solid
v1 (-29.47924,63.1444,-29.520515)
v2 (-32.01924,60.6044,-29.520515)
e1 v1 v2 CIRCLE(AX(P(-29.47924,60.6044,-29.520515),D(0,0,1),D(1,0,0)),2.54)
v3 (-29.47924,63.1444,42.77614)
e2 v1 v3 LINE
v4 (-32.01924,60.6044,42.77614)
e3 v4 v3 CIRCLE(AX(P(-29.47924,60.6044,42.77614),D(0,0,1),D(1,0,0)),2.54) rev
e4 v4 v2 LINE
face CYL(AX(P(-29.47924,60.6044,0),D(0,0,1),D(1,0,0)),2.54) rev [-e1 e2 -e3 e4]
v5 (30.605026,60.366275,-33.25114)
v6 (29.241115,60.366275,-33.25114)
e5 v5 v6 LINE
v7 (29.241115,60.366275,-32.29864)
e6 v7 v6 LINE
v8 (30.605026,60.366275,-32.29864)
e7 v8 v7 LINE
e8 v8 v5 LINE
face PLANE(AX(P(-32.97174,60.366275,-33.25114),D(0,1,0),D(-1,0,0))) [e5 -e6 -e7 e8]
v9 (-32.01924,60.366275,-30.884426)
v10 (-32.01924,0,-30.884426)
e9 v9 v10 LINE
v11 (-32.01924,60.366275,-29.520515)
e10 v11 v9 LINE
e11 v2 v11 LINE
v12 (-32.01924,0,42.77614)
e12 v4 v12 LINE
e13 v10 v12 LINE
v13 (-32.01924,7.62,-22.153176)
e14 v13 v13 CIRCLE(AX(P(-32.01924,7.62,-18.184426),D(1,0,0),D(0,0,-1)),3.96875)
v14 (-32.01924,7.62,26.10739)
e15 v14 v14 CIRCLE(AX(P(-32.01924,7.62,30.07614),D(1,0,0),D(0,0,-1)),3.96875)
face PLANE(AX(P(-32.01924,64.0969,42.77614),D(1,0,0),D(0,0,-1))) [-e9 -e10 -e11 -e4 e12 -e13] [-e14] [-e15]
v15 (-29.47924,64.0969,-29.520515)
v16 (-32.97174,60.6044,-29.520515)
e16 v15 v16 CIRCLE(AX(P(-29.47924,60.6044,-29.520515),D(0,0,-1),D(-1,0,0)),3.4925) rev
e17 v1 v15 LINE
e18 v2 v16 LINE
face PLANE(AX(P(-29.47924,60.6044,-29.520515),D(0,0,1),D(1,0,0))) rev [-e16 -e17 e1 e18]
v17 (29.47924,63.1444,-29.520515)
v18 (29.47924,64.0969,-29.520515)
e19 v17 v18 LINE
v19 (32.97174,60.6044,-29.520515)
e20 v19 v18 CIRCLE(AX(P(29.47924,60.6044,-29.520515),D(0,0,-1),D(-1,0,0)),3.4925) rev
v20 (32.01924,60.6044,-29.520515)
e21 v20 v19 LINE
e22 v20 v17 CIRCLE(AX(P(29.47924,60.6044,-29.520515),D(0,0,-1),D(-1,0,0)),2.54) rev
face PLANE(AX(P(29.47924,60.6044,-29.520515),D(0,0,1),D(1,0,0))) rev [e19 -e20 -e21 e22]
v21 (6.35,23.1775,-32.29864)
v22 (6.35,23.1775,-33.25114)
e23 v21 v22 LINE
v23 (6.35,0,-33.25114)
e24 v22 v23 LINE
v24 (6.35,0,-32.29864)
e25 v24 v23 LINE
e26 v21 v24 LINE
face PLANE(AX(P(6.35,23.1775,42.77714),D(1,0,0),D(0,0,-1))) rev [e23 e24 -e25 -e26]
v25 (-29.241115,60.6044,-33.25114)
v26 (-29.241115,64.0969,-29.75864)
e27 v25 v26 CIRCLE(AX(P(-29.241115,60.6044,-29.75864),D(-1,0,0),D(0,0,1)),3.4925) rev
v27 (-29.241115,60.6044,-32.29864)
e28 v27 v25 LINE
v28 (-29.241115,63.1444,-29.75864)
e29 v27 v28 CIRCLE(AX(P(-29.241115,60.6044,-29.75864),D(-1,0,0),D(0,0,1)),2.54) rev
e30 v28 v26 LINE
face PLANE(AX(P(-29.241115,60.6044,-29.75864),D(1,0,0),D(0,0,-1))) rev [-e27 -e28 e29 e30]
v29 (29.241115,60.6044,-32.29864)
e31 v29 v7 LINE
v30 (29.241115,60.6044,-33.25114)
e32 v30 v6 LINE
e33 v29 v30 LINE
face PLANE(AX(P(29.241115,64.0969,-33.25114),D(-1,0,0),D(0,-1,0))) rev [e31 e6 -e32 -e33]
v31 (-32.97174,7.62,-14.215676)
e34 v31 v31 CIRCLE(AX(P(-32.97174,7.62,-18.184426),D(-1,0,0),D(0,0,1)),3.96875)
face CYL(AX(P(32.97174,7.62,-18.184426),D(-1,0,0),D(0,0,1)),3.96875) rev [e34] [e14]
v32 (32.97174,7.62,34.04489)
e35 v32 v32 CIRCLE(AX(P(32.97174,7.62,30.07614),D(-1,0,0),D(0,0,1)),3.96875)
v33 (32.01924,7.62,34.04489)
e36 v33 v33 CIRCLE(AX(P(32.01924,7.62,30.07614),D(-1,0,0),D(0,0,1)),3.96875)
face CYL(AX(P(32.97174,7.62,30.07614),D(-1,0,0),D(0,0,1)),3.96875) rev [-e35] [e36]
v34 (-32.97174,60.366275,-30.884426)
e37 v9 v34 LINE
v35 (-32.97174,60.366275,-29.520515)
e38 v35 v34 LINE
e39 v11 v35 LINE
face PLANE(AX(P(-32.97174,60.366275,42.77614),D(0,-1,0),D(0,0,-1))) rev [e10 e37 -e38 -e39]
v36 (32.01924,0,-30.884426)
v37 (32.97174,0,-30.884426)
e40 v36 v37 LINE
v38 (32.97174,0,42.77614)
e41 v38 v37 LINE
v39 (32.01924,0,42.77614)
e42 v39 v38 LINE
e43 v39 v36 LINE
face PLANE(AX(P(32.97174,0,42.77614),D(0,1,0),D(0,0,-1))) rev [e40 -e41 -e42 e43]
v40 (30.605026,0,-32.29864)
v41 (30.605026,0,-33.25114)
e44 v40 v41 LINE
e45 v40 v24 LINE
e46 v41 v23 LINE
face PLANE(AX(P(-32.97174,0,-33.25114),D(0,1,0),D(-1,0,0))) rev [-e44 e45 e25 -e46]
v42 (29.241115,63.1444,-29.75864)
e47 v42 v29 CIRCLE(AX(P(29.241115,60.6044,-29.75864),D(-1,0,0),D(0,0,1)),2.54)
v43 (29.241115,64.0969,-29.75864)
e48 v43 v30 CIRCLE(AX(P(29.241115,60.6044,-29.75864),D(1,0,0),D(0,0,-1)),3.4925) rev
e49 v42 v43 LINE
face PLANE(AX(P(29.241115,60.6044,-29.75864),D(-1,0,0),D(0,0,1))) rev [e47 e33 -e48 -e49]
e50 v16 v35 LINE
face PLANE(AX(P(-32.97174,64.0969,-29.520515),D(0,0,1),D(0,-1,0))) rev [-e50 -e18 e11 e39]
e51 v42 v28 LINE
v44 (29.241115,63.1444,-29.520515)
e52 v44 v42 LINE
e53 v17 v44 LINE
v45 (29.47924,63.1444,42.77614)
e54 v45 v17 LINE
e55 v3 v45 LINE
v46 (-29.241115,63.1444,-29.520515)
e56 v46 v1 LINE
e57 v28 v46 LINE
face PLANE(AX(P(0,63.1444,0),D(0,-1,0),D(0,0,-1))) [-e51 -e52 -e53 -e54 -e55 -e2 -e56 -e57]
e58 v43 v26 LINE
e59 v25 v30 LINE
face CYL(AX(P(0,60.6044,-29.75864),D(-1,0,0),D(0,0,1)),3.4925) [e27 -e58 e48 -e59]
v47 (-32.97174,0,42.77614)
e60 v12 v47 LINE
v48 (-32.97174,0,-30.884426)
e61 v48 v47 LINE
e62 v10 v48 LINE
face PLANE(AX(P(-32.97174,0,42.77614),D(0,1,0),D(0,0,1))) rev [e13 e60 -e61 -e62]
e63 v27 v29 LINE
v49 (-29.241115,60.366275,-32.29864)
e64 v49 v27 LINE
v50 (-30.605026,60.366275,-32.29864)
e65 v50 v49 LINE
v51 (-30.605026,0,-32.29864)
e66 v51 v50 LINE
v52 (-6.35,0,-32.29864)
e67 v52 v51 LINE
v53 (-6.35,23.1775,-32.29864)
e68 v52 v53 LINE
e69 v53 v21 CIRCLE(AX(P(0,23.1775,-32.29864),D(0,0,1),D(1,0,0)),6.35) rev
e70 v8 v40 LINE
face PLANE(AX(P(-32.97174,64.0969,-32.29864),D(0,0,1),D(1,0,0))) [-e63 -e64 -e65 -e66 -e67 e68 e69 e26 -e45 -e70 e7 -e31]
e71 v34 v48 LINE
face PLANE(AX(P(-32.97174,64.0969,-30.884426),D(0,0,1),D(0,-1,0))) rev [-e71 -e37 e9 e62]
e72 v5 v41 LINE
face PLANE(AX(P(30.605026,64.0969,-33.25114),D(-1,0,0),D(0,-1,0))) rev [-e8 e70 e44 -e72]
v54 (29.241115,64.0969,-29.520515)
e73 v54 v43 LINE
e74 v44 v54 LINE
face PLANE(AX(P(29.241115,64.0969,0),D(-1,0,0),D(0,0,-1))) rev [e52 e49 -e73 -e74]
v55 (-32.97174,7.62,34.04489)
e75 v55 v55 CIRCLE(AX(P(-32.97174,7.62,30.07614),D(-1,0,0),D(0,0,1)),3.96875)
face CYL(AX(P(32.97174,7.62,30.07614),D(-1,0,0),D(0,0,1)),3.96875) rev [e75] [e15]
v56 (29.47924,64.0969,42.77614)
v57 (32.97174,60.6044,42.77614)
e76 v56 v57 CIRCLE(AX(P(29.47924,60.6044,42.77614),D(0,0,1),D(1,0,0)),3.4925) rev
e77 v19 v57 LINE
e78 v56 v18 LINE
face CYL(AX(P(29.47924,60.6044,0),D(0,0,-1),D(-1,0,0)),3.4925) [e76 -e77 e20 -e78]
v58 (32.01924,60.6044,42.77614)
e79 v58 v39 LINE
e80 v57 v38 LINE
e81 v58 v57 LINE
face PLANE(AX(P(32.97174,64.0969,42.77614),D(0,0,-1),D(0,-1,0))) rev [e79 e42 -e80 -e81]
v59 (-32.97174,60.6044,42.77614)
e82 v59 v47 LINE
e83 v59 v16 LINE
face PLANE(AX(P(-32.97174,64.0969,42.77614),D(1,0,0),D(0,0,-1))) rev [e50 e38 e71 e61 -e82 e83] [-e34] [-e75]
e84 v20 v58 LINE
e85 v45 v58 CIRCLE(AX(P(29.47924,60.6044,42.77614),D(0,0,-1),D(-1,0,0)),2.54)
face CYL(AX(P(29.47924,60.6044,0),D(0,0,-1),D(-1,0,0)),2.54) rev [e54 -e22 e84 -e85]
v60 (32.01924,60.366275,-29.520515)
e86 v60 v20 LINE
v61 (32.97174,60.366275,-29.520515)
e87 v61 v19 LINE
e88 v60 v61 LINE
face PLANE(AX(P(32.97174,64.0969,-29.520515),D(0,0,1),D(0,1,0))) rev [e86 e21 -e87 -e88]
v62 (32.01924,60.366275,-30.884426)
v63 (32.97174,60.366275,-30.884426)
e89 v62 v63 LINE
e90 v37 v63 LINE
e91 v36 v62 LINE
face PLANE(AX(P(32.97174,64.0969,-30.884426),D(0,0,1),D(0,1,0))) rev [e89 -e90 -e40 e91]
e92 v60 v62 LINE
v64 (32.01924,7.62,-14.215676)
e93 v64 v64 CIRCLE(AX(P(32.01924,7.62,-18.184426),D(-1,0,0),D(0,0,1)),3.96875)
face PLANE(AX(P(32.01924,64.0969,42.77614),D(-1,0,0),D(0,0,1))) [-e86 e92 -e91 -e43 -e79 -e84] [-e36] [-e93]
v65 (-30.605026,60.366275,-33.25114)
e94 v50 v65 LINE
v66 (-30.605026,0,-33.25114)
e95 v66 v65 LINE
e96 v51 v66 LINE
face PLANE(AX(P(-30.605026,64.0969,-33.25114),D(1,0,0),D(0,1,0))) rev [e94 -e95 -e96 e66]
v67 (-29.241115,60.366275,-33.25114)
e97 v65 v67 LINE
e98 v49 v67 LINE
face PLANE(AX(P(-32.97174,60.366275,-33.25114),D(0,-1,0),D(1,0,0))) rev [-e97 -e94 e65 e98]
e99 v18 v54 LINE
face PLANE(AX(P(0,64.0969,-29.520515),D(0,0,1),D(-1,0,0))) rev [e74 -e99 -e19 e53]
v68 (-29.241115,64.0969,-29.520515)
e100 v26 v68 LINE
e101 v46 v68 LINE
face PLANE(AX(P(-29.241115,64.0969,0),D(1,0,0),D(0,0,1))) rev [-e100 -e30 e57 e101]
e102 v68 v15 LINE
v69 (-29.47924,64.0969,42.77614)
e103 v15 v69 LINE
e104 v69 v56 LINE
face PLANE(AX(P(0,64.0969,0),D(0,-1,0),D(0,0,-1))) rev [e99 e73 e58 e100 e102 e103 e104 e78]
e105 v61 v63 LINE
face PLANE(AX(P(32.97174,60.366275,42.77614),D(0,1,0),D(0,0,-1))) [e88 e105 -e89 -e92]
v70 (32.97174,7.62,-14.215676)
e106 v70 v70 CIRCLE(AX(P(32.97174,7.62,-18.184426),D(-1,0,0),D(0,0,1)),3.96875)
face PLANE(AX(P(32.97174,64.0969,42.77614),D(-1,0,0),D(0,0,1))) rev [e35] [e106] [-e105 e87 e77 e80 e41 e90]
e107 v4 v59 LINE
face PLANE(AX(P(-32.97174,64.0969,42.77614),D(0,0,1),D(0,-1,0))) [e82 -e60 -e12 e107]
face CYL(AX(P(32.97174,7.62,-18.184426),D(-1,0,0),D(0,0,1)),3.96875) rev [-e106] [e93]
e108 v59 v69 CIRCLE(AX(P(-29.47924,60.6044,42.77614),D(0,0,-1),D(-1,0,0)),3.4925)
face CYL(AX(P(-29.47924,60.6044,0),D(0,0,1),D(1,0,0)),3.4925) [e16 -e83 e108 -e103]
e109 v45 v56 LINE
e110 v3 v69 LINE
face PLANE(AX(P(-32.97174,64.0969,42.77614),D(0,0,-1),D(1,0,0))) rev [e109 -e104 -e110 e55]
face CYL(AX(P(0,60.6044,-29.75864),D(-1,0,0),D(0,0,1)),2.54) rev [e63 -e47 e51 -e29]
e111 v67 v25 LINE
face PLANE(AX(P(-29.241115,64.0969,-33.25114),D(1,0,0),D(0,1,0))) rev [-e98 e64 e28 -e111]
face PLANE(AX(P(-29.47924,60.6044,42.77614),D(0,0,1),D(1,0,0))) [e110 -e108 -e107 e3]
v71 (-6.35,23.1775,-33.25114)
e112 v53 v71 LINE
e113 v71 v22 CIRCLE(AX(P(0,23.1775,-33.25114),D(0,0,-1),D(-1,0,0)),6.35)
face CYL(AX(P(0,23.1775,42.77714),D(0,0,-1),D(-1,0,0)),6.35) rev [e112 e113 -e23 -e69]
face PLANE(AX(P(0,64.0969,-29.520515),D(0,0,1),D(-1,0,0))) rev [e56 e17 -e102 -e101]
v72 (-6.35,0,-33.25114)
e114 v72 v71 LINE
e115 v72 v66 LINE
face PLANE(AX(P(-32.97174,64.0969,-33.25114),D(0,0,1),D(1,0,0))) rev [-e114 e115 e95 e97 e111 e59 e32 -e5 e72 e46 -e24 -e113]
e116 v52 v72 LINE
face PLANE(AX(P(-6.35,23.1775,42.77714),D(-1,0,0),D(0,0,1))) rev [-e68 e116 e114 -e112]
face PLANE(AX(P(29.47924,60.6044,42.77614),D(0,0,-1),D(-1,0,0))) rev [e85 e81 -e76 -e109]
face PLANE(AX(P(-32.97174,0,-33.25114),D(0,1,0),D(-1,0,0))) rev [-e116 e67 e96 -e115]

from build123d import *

# Parameters (mm, degrees)
SKETCH1_W              = 65.94348
SKETCH1_H              = 76.02728
BOSS_EXTRUDE1_DEPTH    = 64.0969
CONVERT_SOLID1_START   = -29.75864
CONVERT_SOLID1_DEPTH   = 72.53478
CONVERT_SOLID1_START_2 = -34
CONVERT_SOLID1_2_DEPTH = 4.479485
CONVERT_SOLID1_START_3 = -32.01924
CONVERT_SOLID1_3_DEPTH = 64.03848
CONVERT_SOLID1_4_DEPTH = 1.98076
CONVERT_SOLID1_START_4 = 32.01924
CONVERT_SOLID1_5_DEPTH = 1.98076
CONVERT_SOLID1_START_5 = -32.97174
CONVERT_SOLID1_6_DEPTH = 3.730625
CONVERT_SOLID1_START_6 = 29.241115
CONVERT_SOLID1_7_DEPTH = 3.730625
CONVERT_SOLID1_START_7 = -29.520515
CONVERT_SOLID1_8_DEPTH = 73.520515
CUT_EXTRUDE4_REACH     = 106.765
SKETCH12_R             = 3.96875
CUT_EXTRUDE5_DEPTH     = 102.423632835


with BuildPart() as part:
    # Sketch1 → Boss-Extrude1 (new body)
    with BuildSketch(Plane(origin=(0, 0, 0), x_dir=(1, 0, 0), z_dir=(0, 1, 0))):
        with Locations((0, -4.7625)):
            Rectangle(SKETCH1_W, SKETCH1_H)
    extrude(amount=BOSS_EXTRUDE1_DEPTH)

    # Convert-Solid1: read off the stored shape, not the designer's step
    # Convert-Solid1 outline → Convert-Solid1 (cut)
    with BuildSketch(Plane.XY.offset(CONVERT_SOLID1_START)):
        with BuildLine():
            Line((-32.01924, 0), (32.01924, 0))
            Line((32.01924, 0), (32.01924, 60.6044))
            ThreePointArc((32.01924, 60.6044), (31.275291224, 62.400451224), (29.47924, 63.1444))
            Line((29.47924, 63.1444), (-29.47924, 63.1444))
            ThreePointArc((-29.47924, 63.1444), (-31.275291224, 62.400451224), (-32.01924, 60.6044))
            Line((-32.01924, 60.6044), (-32.01924, 0))
        make_face()
    extrude(amount=CONVERT_SOLID1_DEPTH, mode=Mode.SUBTRACT)

    # Convert-Solid1 2 outline → Convert-Solid1 2 (cut)
    with BuildSketch(Plane.XY.offset(CONVERT_SOLID1_START_2)):
        with BuildLine():
            Line((-30.605026438, 60.366275), (-29.241115, 60.366275))
            Line((-29.241115, 60.366275), (-29.241115, 63.1444))
            Line((-29.241115, 63.1444), (-29.47924, 63.1444))
            ThreePointArc((-29.47924, 63.1444), (-31.275291224, 62.400451224), (-32.01924, 60.6044))
            Line((-32.01924, 60.6044), (-32.01924, 0))
            Line((-32.01924, 0), (-30.605026438, 0))
            Line((-30.605026438, 0), (-30.605026438, 60.366275))
        make_face()
        with BuildLine():
            Line((29.47924, 63.1444), (29.241115, 63.1444))
            Line((29.241115, 63.1444), (29.241115, 60.366275))
            Line((29.241115, 60.366275), (30.605026438, 60.366275))
            Line((30.605026438, 60.366275), (30.605026438, 0))
            Line((30.605026438, 0), (32.01924, 0))
            Line((32.01924, 0), (32.01924, 60.6044))
            ThreePointArc((32.01924, 60.6044), (31.275291224, 62.400451224), (29.47924, 63.1444))
        make_face()
    extrude(amount=CONVERT_SOLID1_2_DEPTH, mode=Mode.SUBTRACT)

    # Convert-Solid1 3 outline → Convert-Solid1 3 (cut)
    with BuildSketch(Plane.YZ.offset(CONVERT_SOLID1_START_3)):
        with BuildLine():
            Line((63.1444, -29.75864), (63.1444, -29.520515))
            Line((63.1444, -29.520515), (60.366275, -29.520515))
            Line((60.366275, -29.520515), (60.366275, -29.75864))
            Line((60.366275, -29.75864), (0, -29.75864))
            Line((0, -29.75864), (0, -32.29864))
            Line((0, -32.29864), (60.6044, -32.29864))
            ThreePointArc((60.6044, -32.29864), (62.400451224, -31.554691224), (63.1444, -29.75864))
        make_face()
        with BuildLine():
            Line((64.0969, -33.25114), (64.0969, -29.75864))
            ThreePointArc((64.0969, -29.75864), (63.073970433, -32.228210433), (60.6044, -33.25114))
            Line((60.6044, -33.25114), (64.0969, -33.25114))
        make_face()
    extrude(amount=CONVERT_SOLID1_3_DEPTH, mode=Mode.SUBTRACT)

    # Convert-Solid1 4 outline → Convert-Solid1 4 (cut)
    with BuildSketch(Plane.YZ.offset(CONVERT_SOLID1_START_2)):
        Polygon((64.0969, 42.77614), (63.1444, 42.77614), (63.1444, -29.520515), (60.366275, -29.520515), (60.366275, -30.884426438), (0, -30.884426438), (0, -33.25114), (64.0969, -33.25114), align=None)
    extrude(amount=CONVERT_SOLID1_4_DEPTH, mode=Mode.SUBTRACT)

    # Convert-Solid1 5 outline → Convert-Solid1 5 (cut)
    with BuildSketch(Plane.YZ.offset(CONVERT_SOLID1_START_4)):
        Polygon((64.0969, 42.77614), (63.1444, 42.77614), (63.1444, -29.520515), (60.366275, -29.520515), (60.366275, -30.884426438), (0, -30.884426438), (0, -33.25114), (64.0969, -33.25114), align=None)
    extrude(amount=CONVERT_SOLID1_5_DEPTH, mode=Mode.SUBTRACT)

    # Convert-Solid1 6 outline → Convert-Solid1 6 (cut)
    with BuildSketch(Plane.YZ.offset(CONVERT_SOLID1_START_5)):
        with BuildLine():
            Line((64.0969, -29.75864), (64.0969, -29.520515))
            Line((64.0969, -29.520515), (63.1444, -29.520515))
            Line((63.1444, -29.520515), (63.1444, -29.75864))
            ThreePointArc((63.1444, -29.75864), (62.400451224, -31.554691224), (60.6044, -32.29864))
            Line((60.6044, -32.29864), (60.366275, -32.29864))
            Line((60.366275, -32.29864), (60.366275, -33.25114))
            Line((60.366275, -33.25114), (60.6044, -33.25114))
            ThreePointArc((60.6044, -33.25114), (63.073970433, -32.228210433), (64.0969, -29.75864))
        make_face()
    extrude(amount=CONVERT_SOLID1_6_DEPTH, mode=Mode.SUBTRACT)

    # Convert-Solid1 7 outline → Convert-Solid1 7 (cut)
    with BuildSketch(Plane.YZ.offset(CONVERT_SOLID1_START_6)):
        with BuildLine():
            Line((64.0969, -29.75864), (64.0969, -29.520515))
            Line((64.0969, -29.520515), (63.1444, -29.520515))
            Line((63.1444, -29.520515), (63.1444, -29.75864))
            ThreePointArc((63.1444, -29.75864), (62.400451224, -31.554691224), (60.6044, -32.29864))
            Line((60.6044, -32.29864), (60.366275, -32.29864))
            Line((60.366275, -32.29864), (60.366275, -33.25114))
            Line((60.366275, -33.25114), (60.6044, -33.25114))
            ThreePointArc((60.6044, -33.25114), (63.073970433, -32.228210433), (64.0969, -29.75864))
        make_face()
    extrude(amount=CONVERT_SOLID1_7_DEPTH, mode=Mode.SUBTRACT)

    # Convert-Solid1 8 outline → Convert-Solid1 8 (cut)
    with BuildSketch(Plane.XY.offset(CONVERT_SOLID1_START_7)):
        with BuildLine():
            Line((32.01924, 64.0969), (29.47924, 64.0969))
            ThreePointArc((29.47924, 64.0969), (31.948810433, 63.073970433), (32.97174, 60.6044))
            Line((32.97174, 60.6044), (32.97174, 63.1444))
            Line((32.97174, 63.1444), (32.01924, 63.1444))
            Line((32.01924, 63.1444), (32.01924, 64.0969))
        make_face()
        with BuildLine():
            ThreePointArc((-32.97174, 60.6044), (-31.948810433, 63.073970433), (-29.47924, 64.0969))
            Line((-29.47924, 64.0969), (-32.01924, 64.0969))
            Line((-32.01924, 64.0969), (-32.01924, 63.1444))
            Line((-32.01924, 63.1444), (-32.97174, 63.1444))
            Line((-32.97174, 63.1444), (-32.97174, 60.6044))
        make_face()
    extrude(amount=CONVERT_SOLID1_8_DEPTH, mode=Mode.SUBTRACT)

    # Sketch7 → Cut-Extrude4 (cut, up to next)
    with BuildSketch(Plane(origin=(0, 0, -33.25114), x_dir=(-1, 0, 0), z_dir=(0, 0, -1)), mode=Mode.PRIVATE) as cut_extrude4_sk1:
        with BuildLine():
            Line((-6.35, 23.1775), (-6.35, 0))
            Line((-6.35, 0), (6.35, 0))
            Line((6.35, 0), (6.35, 23.1775))
            ThreePointArc((6.35, 23.1775), (0, 29.5275), (-6.35, 23.1775))
        make_face()
    cut_extrude4_tool1 = extrude(cut_extrude4_sk1.sketch, amount=-CUT_EXTRUDE4_REACH, mode=Mode.PRIVATE) & part.part
    add(cut_extrude4_tool1.solids().sort_by_distance((0, 14.118049, -33.25114))[0], mode=Mode.SUBTRACT)

    # Sketch12 → Cut-Extrude5 (cut, through all)
    with BuildSketch(Plane.ZY.offset(32.97174)):
        with Locations((-18.184426438, 7.62)):
            Circle(SKETCH12_R)
        with Locations((30.07614, 7.62)):
            Circle(SKETCH12_R)
    extrude(amount=-CUT_EXTRUDE5_DEPTH, mode=Mode.SUBTRACT)


solid = part.part
